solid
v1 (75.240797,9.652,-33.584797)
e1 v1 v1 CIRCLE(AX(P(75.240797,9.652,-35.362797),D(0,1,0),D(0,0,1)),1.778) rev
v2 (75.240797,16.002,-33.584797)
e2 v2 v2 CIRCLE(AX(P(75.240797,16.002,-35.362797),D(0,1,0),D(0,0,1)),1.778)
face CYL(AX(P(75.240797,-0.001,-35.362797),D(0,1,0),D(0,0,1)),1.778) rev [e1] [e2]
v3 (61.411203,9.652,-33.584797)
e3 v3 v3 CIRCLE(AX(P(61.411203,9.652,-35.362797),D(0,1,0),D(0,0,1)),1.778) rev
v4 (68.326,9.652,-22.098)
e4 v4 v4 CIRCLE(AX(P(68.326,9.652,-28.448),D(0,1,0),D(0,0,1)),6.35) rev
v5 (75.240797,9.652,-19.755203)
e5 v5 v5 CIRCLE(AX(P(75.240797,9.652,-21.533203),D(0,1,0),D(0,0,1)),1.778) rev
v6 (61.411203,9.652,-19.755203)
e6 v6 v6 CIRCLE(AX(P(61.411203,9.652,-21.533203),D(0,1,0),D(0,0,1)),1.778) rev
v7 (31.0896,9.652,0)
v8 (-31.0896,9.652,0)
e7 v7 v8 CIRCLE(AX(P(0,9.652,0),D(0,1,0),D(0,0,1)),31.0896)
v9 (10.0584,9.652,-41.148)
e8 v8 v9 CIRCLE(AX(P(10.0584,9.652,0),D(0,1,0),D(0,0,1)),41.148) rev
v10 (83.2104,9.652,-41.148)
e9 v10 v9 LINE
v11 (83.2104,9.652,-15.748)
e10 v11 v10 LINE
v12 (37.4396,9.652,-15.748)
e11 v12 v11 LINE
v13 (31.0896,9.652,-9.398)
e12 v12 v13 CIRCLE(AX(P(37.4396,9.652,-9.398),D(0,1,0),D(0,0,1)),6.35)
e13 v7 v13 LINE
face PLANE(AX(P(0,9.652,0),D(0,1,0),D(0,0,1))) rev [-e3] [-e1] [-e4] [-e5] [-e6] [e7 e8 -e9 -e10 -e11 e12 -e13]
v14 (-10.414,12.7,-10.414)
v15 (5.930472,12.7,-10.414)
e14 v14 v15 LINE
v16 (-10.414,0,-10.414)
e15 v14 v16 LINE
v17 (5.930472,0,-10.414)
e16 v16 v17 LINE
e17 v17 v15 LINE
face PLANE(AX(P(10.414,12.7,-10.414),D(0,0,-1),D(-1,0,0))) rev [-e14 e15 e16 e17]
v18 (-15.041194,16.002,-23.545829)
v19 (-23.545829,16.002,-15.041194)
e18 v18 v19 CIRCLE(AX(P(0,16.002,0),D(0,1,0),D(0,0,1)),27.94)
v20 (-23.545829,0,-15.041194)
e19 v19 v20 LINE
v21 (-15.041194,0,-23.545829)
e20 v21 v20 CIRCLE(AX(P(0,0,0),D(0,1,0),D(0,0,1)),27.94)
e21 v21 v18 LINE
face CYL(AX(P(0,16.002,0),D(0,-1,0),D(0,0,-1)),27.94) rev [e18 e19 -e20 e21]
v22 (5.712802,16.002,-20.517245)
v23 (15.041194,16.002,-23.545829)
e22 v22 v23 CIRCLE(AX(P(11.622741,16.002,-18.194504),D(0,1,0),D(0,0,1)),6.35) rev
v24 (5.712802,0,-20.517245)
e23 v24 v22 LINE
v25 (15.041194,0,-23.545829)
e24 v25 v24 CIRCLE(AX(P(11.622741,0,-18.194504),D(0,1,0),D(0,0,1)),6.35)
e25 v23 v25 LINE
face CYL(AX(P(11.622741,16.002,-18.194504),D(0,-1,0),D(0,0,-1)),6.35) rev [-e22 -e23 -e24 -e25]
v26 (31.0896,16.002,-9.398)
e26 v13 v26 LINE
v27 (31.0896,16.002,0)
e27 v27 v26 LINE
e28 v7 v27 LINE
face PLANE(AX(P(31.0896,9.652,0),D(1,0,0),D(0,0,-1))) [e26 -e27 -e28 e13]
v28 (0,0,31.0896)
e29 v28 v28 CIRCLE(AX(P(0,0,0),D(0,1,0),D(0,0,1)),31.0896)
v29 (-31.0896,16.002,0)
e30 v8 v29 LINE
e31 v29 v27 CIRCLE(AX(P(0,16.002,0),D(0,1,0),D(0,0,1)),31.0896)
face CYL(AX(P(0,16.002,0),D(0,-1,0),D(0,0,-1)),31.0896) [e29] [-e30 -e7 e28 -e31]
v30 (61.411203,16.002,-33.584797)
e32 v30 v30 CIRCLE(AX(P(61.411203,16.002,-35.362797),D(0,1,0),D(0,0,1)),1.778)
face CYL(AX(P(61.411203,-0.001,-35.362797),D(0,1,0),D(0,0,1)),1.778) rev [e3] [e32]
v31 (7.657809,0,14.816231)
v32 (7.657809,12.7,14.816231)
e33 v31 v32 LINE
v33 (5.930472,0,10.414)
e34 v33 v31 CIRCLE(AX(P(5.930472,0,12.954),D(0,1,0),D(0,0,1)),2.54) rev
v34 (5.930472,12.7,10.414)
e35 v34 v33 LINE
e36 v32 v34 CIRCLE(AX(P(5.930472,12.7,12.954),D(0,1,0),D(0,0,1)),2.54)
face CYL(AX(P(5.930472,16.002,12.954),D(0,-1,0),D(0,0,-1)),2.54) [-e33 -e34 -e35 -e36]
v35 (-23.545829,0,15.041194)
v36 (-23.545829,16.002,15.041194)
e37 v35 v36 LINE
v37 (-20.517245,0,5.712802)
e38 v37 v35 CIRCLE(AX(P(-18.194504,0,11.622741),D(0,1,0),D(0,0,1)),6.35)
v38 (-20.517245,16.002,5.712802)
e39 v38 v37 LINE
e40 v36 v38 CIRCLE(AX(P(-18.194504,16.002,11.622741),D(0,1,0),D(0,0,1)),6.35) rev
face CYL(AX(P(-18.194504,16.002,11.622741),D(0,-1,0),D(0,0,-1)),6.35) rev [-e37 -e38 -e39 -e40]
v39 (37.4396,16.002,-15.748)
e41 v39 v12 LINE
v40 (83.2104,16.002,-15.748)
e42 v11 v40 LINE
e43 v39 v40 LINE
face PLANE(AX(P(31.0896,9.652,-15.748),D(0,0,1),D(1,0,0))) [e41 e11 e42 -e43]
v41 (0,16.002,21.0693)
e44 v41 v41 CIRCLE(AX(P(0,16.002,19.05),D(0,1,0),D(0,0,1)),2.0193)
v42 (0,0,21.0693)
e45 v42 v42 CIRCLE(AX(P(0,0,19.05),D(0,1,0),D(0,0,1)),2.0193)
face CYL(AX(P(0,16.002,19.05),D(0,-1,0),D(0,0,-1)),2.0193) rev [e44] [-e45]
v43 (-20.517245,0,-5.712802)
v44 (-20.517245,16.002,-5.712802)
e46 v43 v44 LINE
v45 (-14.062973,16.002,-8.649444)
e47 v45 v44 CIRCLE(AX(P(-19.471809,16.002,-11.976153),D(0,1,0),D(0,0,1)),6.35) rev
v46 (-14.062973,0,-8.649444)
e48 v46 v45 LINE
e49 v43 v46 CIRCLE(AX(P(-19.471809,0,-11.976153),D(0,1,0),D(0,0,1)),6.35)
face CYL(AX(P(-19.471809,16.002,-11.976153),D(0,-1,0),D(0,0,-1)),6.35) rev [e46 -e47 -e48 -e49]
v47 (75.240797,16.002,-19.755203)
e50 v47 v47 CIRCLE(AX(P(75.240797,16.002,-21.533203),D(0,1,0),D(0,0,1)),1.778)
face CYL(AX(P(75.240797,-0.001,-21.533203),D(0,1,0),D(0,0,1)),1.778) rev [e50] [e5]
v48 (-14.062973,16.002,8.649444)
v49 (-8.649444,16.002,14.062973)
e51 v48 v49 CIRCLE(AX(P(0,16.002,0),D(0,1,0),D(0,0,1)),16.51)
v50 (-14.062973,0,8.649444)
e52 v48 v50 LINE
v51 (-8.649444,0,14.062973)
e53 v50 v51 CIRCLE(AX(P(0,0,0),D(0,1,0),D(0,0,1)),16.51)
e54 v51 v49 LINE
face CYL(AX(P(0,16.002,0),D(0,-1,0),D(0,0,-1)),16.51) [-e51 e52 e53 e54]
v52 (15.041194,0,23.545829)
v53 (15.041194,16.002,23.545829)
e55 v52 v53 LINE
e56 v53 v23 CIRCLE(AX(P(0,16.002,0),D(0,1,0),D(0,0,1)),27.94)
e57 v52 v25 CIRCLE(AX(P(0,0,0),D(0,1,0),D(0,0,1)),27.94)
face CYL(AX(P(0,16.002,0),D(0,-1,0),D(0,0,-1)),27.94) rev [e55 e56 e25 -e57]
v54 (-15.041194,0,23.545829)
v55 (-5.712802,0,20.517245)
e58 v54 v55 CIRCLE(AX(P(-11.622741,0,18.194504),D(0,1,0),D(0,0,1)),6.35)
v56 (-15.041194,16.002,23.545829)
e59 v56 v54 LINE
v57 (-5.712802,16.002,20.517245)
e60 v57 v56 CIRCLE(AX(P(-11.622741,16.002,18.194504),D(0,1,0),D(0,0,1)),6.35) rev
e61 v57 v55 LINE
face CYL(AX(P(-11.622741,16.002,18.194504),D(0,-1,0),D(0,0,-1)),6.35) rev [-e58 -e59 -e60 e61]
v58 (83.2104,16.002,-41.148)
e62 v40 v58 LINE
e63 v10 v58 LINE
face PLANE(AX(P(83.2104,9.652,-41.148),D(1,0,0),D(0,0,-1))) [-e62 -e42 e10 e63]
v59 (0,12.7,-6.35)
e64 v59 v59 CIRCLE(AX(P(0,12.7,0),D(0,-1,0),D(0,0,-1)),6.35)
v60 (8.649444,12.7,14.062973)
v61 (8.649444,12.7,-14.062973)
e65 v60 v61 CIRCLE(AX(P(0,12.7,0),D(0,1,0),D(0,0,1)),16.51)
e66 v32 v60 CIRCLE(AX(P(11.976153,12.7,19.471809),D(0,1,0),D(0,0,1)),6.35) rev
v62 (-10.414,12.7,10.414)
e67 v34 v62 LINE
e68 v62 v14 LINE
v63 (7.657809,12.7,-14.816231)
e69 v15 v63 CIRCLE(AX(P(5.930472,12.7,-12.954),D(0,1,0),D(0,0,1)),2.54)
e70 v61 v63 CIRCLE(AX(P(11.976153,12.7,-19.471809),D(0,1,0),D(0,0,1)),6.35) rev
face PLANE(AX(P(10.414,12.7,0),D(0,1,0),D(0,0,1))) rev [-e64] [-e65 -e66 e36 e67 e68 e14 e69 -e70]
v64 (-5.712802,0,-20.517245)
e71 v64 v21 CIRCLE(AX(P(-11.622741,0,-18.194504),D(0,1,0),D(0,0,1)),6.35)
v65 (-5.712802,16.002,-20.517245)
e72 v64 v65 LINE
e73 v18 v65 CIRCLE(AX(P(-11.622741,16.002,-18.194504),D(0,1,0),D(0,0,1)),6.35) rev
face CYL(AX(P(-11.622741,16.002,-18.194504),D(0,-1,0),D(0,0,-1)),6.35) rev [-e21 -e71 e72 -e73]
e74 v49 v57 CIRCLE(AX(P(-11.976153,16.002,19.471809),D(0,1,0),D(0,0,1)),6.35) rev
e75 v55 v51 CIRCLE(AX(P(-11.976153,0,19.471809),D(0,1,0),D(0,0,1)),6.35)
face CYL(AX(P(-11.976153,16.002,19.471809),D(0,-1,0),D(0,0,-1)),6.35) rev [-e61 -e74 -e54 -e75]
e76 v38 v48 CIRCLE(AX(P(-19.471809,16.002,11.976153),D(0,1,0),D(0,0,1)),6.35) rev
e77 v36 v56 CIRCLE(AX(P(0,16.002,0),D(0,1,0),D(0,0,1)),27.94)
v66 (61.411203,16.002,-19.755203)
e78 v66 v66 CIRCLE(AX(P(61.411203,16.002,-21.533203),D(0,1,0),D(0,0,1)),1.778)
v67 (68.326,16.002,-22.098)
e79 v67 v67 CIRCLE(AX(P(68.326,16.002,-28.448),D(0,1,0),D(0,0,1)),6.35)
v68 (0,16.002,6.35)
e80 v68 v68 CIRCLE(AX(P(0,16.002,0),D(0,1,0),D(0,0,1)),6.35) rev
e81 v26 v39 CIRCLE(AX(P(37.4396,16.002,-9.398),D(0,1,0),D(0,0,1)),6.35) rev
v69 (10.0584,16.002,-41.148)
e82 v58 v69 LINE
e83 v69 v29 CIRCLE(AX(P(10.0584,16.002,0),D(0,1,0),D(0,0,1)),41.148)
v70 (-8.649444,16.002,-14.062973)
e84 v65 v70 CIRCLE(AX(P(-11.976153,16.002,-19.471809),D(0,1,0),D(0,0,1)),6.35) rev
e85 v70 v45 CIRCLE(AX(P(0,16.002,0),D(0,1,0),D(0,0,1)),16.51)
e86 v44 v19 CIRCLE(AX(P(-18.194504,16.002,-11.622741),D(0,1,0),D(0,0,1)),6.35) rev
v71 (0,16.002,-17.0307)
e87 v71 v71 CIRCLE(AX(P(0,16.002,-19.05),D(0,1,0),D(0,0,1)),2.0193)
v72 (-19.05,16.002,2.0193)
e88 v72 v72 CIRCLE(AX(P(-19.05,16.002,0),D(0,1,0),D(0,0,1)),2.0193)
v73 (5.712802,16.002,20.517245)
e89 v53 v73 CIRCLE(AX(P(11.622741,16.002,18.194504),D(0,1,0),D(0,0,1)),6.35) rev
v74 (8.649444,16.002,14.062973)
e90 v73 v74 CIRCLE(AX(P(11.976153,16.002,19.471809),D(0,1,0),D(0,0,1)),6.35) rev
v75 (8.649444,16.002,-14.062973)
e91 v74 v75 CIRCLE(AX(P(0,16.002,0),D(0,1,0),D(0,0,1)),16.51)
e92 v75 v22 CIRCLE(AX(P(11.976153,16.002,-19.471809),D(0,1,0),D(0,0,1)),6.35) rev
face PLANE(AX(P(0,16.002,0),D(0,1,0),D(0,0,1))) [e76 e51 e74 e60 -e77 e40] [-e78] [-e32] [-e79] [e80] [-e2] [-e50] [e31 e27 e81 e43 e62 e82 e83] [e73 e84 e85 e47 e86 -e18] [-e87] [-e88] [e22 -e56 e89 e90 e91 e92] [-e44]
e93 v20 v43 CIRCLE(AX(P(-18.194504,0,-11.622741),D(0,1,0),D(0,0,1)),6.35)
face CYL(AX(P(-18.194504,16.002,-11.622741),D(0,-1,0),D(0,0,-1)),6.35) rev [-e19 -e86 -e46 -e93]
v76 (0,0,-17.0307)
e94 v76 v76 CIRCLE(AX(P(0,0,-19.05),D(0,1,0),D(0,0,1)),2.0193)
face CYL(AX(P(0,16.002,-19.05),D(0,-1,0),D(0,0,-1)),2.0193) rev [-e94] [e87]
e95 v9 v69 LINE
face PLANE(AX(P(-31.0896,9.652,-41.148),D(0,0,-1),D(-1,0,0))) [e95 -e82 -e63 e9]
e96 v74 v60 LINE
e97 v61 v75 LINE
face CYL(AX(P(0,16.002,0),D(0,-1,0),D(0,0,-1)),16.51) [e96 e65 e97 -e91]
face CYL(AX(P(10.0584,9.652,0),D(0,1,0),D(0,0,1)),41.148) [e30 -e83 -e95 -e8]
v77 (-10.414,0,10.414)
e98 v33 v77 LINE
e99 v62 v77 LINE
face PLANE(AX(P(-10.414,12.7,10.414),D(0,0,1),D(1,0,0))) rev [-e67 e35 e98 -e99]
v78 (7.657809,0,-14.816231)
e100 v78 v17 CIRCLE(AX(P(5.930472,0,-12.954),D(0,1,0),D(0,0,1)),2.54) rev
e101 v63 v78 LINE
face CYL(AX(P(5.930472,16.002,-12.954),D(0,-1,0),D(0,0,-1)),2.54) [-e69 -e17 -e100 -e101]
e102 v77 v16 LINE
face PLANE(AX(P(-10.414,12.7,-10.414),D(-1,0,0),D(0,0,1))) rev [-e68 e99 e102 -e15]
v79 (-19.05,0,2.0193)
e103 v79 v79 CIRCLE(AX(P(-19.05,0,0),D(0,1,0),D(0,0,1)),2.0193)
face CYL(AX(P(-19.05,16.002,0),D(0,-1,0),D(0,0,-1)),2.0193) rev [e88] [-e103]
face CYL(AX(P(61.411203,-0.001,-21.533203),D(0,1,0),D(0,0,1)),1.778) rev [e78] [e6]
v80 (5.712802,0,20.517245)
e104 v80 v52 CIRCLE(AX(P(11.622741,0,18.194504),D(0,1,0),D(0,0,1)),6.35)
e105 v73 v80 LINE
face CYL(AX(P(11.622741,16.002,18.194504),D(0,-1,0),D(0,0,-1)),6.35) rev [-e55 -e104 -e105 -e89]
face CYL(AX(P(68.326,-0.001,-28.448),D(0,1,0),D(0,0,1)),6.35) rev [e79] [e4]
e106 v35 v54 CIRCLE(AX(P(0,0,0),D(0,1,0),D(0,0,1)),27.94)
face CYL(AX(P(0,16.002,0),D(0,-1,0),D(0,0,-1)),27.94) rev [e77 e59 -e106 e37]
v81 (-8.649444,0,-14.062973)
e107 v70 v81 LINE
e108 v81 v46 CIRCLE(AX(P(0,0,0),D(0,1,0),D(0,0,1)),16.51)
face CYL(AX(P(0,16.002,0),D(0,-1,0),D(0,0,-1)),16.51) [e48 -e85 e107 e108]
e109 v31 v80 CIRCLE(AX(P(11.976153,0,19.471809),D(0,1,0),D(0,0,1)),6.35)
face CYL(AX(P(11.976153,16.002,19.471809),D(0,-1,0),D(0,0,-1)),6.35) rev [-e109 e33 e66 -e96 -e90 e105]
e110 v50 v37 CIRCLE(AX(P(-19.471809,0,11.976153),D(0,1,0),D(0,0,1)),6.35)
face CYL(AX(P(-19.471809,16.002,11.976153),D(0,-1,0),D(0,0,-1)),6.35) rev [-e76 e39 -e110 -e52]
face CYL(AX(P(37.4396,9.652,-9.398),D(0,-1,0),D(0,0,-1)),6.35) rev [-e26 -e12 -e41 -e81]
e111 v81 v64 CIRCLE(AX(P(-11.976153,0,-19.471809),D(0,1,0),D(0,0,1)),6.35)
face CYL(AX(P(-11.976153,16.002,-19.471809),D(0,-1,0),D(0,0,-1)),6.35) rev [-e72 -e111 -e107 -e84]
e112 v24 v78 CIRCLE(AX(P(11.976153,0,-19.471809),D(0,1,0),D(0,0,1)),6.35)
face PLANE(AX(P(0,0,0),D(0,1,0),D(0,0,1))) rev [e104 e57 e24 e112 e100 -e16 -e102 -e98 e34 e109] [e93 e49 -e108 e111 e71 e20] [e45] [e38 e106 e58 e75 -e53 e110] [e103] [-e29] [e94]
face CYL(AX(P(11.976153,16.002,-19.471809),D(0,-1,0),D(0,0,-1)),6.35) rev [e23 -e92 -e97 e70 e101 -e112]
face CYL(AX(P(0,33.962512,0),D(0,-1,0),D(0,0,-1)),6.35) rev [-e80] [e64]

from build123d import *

# Parameters (mm, degrees)
SKETCH1_R           = 31.0896
BOSS_EXTRUDE1_DEPTH = 16.002
BOSS_EXTRUDE2_START = -6.35
BOSS_EXTRUDE2_DEPTH = 6.35
FILLET2_R           = 6.35
CUT_EXTRUDE2_REACH  = 96.198
SKETCH4_R           = 1.778
SKETCH4_R_2         = 6.35
SKETCH7_R           = 2.0193
CUT_EXTRUDE4_DEPTH  = 95.197625109
FILLET7_R           = 6.35
FILLET8_R           = 41.148
CUT_EXTRUDE5_DEPTH  = 12.7
FILLET9_R           = 2.54
SKETCH9_R           = 6.35
CUT_EXTRUDE6_DEPTH  = 3.302


# Some blends are built 0.0001 mm under size
with BuildPart() as part:
    # Sketch1 → Boss-Extrude1 (new body)
    with BuildSketch(Plane(origin=(0, 0, 0), x_dir=(1, 0, 0), z_dir=(0, 1, 0))):
        with Locations(Location((0, 0, 0), (0, 0, 270))):
            Circle(SKETCH1_R)
    extrude(amount=BOSS_EXTRUDE1_DEPTH)

    # Sketch2 → Boss-Extrude2 (add)
    with BuildSketch(Plane(origin=(0, 16.002, 0), x_dir=(1, 0, 0), z_dir=(0, 1, 0)).offset(BOSS_EXTRUDE2_START)):
        with BuildLine():
            Line((-31.0896, 0), (-31.0896, 41.148))
            Line((-31.0896, 41.148), (83.2104, 41.148))
            Line((83.2104, 41.148), (83.2104, 15.748))
            Line((83.2104, 15.748), (31.0896, 15.748))
            Line((31.0896, 15.748), (31.0896, 0))
            ThreePointArc((31.0896, 0), (0, -31.0896), (-31.0896, 0))
        make_face()
    extrude(amount=BOSS_EXTRUDE2_DEPTH)

    # Fillet2
    fillet2_edges = [part.edges().sort_by_distance(p)[0] for p in [
        (31.0896, 12.827, -15.748),
    ]]
    fillet(fillet2_edges, radius=FILLET2_R)

    # Sketch4 → Cut-Extrude2 (cut, up to next)
    with BuildSketch(Plane(origin=(0, 16.002, 0), x_dir=(1, 0, 0), z_dir=(0, 1, 0)), mode=Mode.PRIVATE) as cut_extrude2_sk1:
        with Locations(Location((61.411202787, 35.362797213, 0), (0, 0, 270))):
            Circle(SKETCH4_R)
    cut_extrude2_tool1 = extrude(cut_extrude2_sk1.sketch, amount=-CUT_EXTRUDE2_REACH, mode=Mode.PRIVATE) & part.part
    # Sketch4 → Cut-Extrude2 (cut, up to next)
    with BuildSketch(Plane(origin=(0, 16.002, 0), x_dir=(1, 0, 0), z_dir=(0, 1, 0)), mode=Mode.PRIVATE) as cut_extrude2_sk2:
        with Locations(Location((75.240797213, 35.362797213, 0), (0, 0, 270))):
            Circle(SKETCH4_R)
    cut_extrude2_tool2 = extrude(cut_extrude2_sk2.sketch, amount=-CUT_EXTRUDE2_REACH, mode=Mode.PRIVATE) & part.part
    # Sketch4 → Cut-Extrude2 (cut, up to next)
    with BuildSketch(Plane(origin=(0, 16.002, 0), x_dir=(1, 0, 0), z_dir=(0, 1, 0)), mode=Mode.PRIVATE) as cut_extrude2_sk3:
        with Locations(Location((75.240797213, 21.533202787, 0), (0, 0, 270))):
            Circle(SKETCH4_R)
    cut_extrude2_tool3 = extrude(cut_extrude2_sk3.sketch, amount=-CUT_EXTRUDE2_REACH, mode=Mode.PRIVATE) & part.part
    # Sketch4 → Cut-Extrude2 (cut, up to next)
    with BuildSketch(Plane(origin=(0, 16.002, 0), x_dir=(1, 0, 0), z_dir=(0, 1, 0)), mode=Mode.PRIVATE) as cut_extrude2_sk4:
        with Locations(Location((68.326, 28.448, 0), (0, 0, 270))):
            Circle(SKETCH4_R_2)
    cut_extrude2_tool4 = extrude(cut_extrude2_sk4.sketch, amount=-CUT_EXTRUDE2_REACH, mode=Mode.PRIVATE) & part.part
    # Sketch4 → Cut-Extrude2 (cut, up to next)
    with BuildSketch(Plane(origin=(0, 16.002, 0), x_dir=(1, 0, 0), z_dir=(0, 1, 0)), mode=Mode.PRIVATE) as cut_extrude2_sk5:
        with Locations(Location((61.411202787, 21.533202787, 0), (0, 0, 270))):
            Circle(SKETCH4_R)
    cut_extrude2_tool5 = extrude(cut_extrude2_sk5.sketch, amount=-CUT_EXTRUDE2_REACH, mode=Mode.PRIVATE) & part.part
    add(cut_extrude2_tool1.solids().sort_by_distance((61.411203, 16.002, -35.362797))[0], mode=Mode.SUBTRACT)
    add(cut_extrude2_tool2.solids().sort_by_distance((75.240797, 16.002, -35.362797))[0], mode=Mode.SUBTRACT)
    add(cut_extrude2_tool3.solids().sort_by_distance((75.240797, 16.002, -21.533203))[0], mode=Mode.SUBTRACT)
    add(cut_extrude2_tool4.solids().sort_by_distance((68.326, 16.002, -28.448))[0], mode=Mode.SUBTRACT)
    add(cut_extrude2_tool5.solids().sort_by_distance((61.411203, 16.002, -21.533203))[0], mode=Mode.SUBTRACT)

    # Sketch7 → Cut-Extrude4 (cut, through all)
    with BuildSketch(Plane(origin=(0, 0, 0), x_dir=(1, 0, 0), z_dir=(0, 1, 0))):
        with BuildLine():
            ThreePointArc((27.94, 0), (22.235278576, 16.918510179), (7.450666667, 26.928259621))
            Line((7.450666667, 26.928259621), (4.402666667, 15.912153412))
            ThreePointArc((4.402666667, 15.912153412), (13.139028249, 9.997301469), (16.51, 0))
            ThreePointArc((16.51, 0), (13.139028249, -9.997301469), (4.402666667, -15.912153412))
            Line((4.402666667, -15.912153412), (7.450666667, -26.928259621))
            ThreePointArc((7.450666667, -26.928259621), (22.235278576, -16.918510179), (27.94, 0))
        make_face()
        with BuildLine():
            Line((-15.912153412, -4.402666667), (-26.928259621, -7.450666667))
            ThreePointArc((-26.928259621, -7.450666667), (-19.756563466, -19.756563466), (-7.450666667, -26.928259621))
            Line((-7.450666667, -26.928259621), (-4.402666667, -15.912153412))
            ThreePointArc((-4.402666667, -15.912153412), (-11.674332957, -11.674332957), (-15.912153412, -4.402666667))
        make_face()
        with BuildLine():
            Line((-4.402666667, 15.912153412), (-7.450666667, 26.928259621))
            ThreePointArc((-7.450666667, 26.928259621), (-19.756563466, 19.756563466), (-26.928259621, 7.450666667))
            Line((-26.928259621, 7.450666667), (-15.912153412, 4.402666667))
            ThreePointArc((-15.912153412, 4.402666667), (-11.674332957, 11.674332957), (-4.402666667, 15.912153412))
        make_face()
        with Locations(Location((-19.05, 0, 0), (0, 0, 270))):
            Circle(SKETCH7_R)
        with Locations(Location((0, -19.05, 0), (0, 0, 270))):
            Circle(SKETCH7_R)
        with Locations(Location((0, 19.05, 0), (0, 0, 270))):
            Circle(SKETCH7_R)
    extrude(amount=CUT_EXTRUDE4_DEPTH, mode=Mode.SUBTRACT)

    # Fillet7
    # the kernel refuses this fillet: 6.35 mm, written as the material it adds along each edge
    with BuildSketch(Plane(origin=(-26.928259621, 0, -7.450666667), x_dir=(0.40702884348062, 0, -0.9134153056385845), z_dir=(0, 1, 0)), Plane(origin=(-7.450666667, 0, 26.928259621), x_dir=(-0.9134153056385848, 0, -0.40702884348061963), z_dir=(0, 1, 0))) as fillet7_piece_1:
        with BuildLine():
            CenterArc((7.365726845, -6.279391075), FILLET7_R, 81.447682412, 107.104635177)
            Line((1.086335771, -7.223715029), (0, 0))
            ThreePointArc((0, 0), (4.1550254, 0.310679271), (8.3100508, 0))
        make_face()
    extrude(amount=16.002)
    with BuildSketch(Plane(origin=(-7.450666667, 0, -26.928259621), x_dir=(0.26666666666666705, 0, 0.9637888196533972), z_dir=(0, 1, 0)), Plane(origin=(7.450666667, 0, 26.928259621), x_dir=(-0.26666666666666733, 0, -0.9637888196533971), z_dir=(0, 1, 0)), Plane(origin=(-26.928259621, 0, 7.450666667), x_dir=(0.9637888196533975, 0, -0.26666666666666644), z_dir=(0, 1, 0))) as fillet7_piece_2:
        with BuildLine():
            CenterArc((7.304942452, -6.35), FILLET7_R, 90, 107.104635177)
            ThreePointArc((1.235807879, -8.217647059), (0.310679271, -4.1550254), (0, 0))
            Line((0, 0), (7.304942452, 0))
        make_face()
    extrude(amount=16.002)
    with BuildSketch(Plane(origin=(-4.402666667, 0, -15.912153412), x_dir=(-0.916852417954672, 0, 0.39922630636103035), z_dir=(0, 1, 0)), Plane(origin=(4.402666667, 0, 15.912153412), x_dir=(0.9168524179546733, 0, -0.39922630636102746), z_dir=(0, 1, 0)), Plane(origin=(-15.912153412, 0, 4.402666667), x_dir=(0.39922630636102946, 0, 0.9168524179546725), z_dir=(0, 1, 0))) as fillet7_piece_3:
        with BuildLine():
            CenterArc((5.522661099, -6.287214109), FILLET7_R, 98.063810107, 73.872379787)
            Line((-0.76455301, -5.396462319), (0, 0))
            ThreePointArc((0, 0), (2.315954654, -0.163243317), (4.631909309, 0))
        make_face()
    extrude(amount=16.002)
    with BuildSketch(Plane(origin=(4.402666667, 0, -15.912153412), x_dir=(0.26666666666666416, 0, -0.9637888196533979), z_dir=(0, 1, 0))) as fillet7_piece_4:
        with BuildLine():
            CenterArc((5.450352912, -6.35), FILLET7_R, 90, 73.872379787)
            ThreePointArc((-0.649745119, -4.586111111), (-0.163243317, -2.315954654), (0, 0))
            Line((0, 0), (5.450352912, 0))
        make_face()
    extrude(amount=16.002)
    with BuildSketch(Plane(origin=(7.450666667, 0, -26.928259621), x_dir=(-0.2666666666666666, 0, 0.9637888196533974), z_dir=(0, 1, 0))) as fillet7_piece_5:
        with BuildLine():
            CenterArc((7.304942452, 6.35), FILLET7_R, 162.895364823, 107.104635177)
            ThreePointArc((1.235807879, 8.217647059), (0.310679271, 4.1550254), (0, 0))
            Line((0, 0), (7.304942452, 0))
        make_face()
    extrude(amount=16.002)
    with BuildSketch(Plane(origin=(-4.402666667, 0, 15.912153412), x_dir=(-0.9168524179546729, 0, -0.3992263063610288), z_dir=(0, 1, 0)), Plane(origin=(-15.912153412, 0, -4.402666667), x_dir=(0.39922630636102996, 0, -0.9168524179546723), z_dir=(0, 1, 0))) as fillet7_piece_6:
        with BuildLine():
            CenterArc((5.522661099, 6.287214109), FILLET7_R, 188.063810107, 73.872379787)
            Line((-0.76455301, 5.396462319), (0, 0))
            ThreePointArc((0, 0), (2.315954654, 0.163243317), (4.631909309, 0))
        make_face()
    extrude(amount=16.002)

    # Fillet8
    fillet8_edges = [part.edges().sort_by_distance(p)[0] for p in [
        (-31.0896, 12.827, -41.148),
    ]]
    fillet(fillet8_edges, radius=FILLET8_R - 0.0001)  # a hair under: the kernel refuses the full size

    # Sketch8 → Cut-Extrude5 (cut)
    with BuildSketch(Plane.XZ):
        with BuildLine():
            Line((-10.414, 10.414), (10.414, 10.414))
            ThreePointArc((10.414, 10.414), (20.828, 0), (10.414, -10.414))
            Line((10.414, -10.414), (-10.414, -10.414))
            Line((-10.414, -10.414), (-10.414, 10.414))
        make_face()
    extrude(amount=-CUT_EXTRUDE5_DEPTH, mode=Mode.SUBTRACT)

    # Fillet9
    # the kernel refuses this fillet: 2.54 mm, written as the material it takes off along each edge
    with BuildSketch(Plane(origin=(13.087195122, 12.7, 10.065059555), x_dir=(-0.7525451578932851, 0, 0.658540648199768), z_dir=(0, -1, 0))) as fillet9_piece_1:
        with BuildLine():
            CenterArc((7.288242174, 2.538935053), FILLET9_R, 131.188669075, 137.152126286)
            Line((5.615548928, 4.450399754), (5.448279603, 4.641546224))
            ThreePointArc((5.448279603, 4.641546224), (2.074222188, 1.688960676), (-0.1125988, 0.227678524))
            Line((-0.1125988, 0.227678524), (-0.049545453, -0.249120951))
            ThreePointArc((-0.049545453, -0.249120951), (6.014734512, -0.336617786), (7.207343199, -0.253893505))
            Line((7.207343199, -0.253893505), (7.214697651, 0))
        make_face()
    extrude(amount=30.736744128, mode=Mode.SUBTRACT)
    with BuildSketch(Plane(origin=(13.087195122, 12.7, -10.065059555), x_dir=(-0.7525451578933744, 0, -0.658540648199666), z_dir=(0, -1, 0))) as fillet9_piece_2:
        with BuildLine():
            CenterArc((7.288242174, -2.538935053), FILLET9_R, 91.659204639, 137.152126286)
            Line((5.615548928, -4.450399754), (5.448279603, -4.641546224))
            ThreePointArc((5.448279603, -4.641546224), (2.074222188, -1.688960676), (-0.1125988, -0.227678524))
            Line((-0.1125988, -0.227678524), (-0.049545453, 0.249120951))
            ThreePointArc((-0.049545453, 0.249120951), (6.014734512, 0.336617786), (7.207343199, 0.253893505))
            Line((7.207343199, 0.253893505), (7.214697651, 0))
        make_face()
    extrude(amount=30.736744128, mode=Mode.SUBTRACT)

    # Sketch9 → Cut-Extrude6 (cut)
    with BuildSketch(Plane.XZ.offset(-12.7)):
        with Locations(Location((0, 0, 0), (0, 0, 270))):
            Circle(SKETCH9_R)
    extrude(amount=-CUT_EXTRUDE6_DEPTH, mode=Mode.SUBTRACT)


solid = part.part
